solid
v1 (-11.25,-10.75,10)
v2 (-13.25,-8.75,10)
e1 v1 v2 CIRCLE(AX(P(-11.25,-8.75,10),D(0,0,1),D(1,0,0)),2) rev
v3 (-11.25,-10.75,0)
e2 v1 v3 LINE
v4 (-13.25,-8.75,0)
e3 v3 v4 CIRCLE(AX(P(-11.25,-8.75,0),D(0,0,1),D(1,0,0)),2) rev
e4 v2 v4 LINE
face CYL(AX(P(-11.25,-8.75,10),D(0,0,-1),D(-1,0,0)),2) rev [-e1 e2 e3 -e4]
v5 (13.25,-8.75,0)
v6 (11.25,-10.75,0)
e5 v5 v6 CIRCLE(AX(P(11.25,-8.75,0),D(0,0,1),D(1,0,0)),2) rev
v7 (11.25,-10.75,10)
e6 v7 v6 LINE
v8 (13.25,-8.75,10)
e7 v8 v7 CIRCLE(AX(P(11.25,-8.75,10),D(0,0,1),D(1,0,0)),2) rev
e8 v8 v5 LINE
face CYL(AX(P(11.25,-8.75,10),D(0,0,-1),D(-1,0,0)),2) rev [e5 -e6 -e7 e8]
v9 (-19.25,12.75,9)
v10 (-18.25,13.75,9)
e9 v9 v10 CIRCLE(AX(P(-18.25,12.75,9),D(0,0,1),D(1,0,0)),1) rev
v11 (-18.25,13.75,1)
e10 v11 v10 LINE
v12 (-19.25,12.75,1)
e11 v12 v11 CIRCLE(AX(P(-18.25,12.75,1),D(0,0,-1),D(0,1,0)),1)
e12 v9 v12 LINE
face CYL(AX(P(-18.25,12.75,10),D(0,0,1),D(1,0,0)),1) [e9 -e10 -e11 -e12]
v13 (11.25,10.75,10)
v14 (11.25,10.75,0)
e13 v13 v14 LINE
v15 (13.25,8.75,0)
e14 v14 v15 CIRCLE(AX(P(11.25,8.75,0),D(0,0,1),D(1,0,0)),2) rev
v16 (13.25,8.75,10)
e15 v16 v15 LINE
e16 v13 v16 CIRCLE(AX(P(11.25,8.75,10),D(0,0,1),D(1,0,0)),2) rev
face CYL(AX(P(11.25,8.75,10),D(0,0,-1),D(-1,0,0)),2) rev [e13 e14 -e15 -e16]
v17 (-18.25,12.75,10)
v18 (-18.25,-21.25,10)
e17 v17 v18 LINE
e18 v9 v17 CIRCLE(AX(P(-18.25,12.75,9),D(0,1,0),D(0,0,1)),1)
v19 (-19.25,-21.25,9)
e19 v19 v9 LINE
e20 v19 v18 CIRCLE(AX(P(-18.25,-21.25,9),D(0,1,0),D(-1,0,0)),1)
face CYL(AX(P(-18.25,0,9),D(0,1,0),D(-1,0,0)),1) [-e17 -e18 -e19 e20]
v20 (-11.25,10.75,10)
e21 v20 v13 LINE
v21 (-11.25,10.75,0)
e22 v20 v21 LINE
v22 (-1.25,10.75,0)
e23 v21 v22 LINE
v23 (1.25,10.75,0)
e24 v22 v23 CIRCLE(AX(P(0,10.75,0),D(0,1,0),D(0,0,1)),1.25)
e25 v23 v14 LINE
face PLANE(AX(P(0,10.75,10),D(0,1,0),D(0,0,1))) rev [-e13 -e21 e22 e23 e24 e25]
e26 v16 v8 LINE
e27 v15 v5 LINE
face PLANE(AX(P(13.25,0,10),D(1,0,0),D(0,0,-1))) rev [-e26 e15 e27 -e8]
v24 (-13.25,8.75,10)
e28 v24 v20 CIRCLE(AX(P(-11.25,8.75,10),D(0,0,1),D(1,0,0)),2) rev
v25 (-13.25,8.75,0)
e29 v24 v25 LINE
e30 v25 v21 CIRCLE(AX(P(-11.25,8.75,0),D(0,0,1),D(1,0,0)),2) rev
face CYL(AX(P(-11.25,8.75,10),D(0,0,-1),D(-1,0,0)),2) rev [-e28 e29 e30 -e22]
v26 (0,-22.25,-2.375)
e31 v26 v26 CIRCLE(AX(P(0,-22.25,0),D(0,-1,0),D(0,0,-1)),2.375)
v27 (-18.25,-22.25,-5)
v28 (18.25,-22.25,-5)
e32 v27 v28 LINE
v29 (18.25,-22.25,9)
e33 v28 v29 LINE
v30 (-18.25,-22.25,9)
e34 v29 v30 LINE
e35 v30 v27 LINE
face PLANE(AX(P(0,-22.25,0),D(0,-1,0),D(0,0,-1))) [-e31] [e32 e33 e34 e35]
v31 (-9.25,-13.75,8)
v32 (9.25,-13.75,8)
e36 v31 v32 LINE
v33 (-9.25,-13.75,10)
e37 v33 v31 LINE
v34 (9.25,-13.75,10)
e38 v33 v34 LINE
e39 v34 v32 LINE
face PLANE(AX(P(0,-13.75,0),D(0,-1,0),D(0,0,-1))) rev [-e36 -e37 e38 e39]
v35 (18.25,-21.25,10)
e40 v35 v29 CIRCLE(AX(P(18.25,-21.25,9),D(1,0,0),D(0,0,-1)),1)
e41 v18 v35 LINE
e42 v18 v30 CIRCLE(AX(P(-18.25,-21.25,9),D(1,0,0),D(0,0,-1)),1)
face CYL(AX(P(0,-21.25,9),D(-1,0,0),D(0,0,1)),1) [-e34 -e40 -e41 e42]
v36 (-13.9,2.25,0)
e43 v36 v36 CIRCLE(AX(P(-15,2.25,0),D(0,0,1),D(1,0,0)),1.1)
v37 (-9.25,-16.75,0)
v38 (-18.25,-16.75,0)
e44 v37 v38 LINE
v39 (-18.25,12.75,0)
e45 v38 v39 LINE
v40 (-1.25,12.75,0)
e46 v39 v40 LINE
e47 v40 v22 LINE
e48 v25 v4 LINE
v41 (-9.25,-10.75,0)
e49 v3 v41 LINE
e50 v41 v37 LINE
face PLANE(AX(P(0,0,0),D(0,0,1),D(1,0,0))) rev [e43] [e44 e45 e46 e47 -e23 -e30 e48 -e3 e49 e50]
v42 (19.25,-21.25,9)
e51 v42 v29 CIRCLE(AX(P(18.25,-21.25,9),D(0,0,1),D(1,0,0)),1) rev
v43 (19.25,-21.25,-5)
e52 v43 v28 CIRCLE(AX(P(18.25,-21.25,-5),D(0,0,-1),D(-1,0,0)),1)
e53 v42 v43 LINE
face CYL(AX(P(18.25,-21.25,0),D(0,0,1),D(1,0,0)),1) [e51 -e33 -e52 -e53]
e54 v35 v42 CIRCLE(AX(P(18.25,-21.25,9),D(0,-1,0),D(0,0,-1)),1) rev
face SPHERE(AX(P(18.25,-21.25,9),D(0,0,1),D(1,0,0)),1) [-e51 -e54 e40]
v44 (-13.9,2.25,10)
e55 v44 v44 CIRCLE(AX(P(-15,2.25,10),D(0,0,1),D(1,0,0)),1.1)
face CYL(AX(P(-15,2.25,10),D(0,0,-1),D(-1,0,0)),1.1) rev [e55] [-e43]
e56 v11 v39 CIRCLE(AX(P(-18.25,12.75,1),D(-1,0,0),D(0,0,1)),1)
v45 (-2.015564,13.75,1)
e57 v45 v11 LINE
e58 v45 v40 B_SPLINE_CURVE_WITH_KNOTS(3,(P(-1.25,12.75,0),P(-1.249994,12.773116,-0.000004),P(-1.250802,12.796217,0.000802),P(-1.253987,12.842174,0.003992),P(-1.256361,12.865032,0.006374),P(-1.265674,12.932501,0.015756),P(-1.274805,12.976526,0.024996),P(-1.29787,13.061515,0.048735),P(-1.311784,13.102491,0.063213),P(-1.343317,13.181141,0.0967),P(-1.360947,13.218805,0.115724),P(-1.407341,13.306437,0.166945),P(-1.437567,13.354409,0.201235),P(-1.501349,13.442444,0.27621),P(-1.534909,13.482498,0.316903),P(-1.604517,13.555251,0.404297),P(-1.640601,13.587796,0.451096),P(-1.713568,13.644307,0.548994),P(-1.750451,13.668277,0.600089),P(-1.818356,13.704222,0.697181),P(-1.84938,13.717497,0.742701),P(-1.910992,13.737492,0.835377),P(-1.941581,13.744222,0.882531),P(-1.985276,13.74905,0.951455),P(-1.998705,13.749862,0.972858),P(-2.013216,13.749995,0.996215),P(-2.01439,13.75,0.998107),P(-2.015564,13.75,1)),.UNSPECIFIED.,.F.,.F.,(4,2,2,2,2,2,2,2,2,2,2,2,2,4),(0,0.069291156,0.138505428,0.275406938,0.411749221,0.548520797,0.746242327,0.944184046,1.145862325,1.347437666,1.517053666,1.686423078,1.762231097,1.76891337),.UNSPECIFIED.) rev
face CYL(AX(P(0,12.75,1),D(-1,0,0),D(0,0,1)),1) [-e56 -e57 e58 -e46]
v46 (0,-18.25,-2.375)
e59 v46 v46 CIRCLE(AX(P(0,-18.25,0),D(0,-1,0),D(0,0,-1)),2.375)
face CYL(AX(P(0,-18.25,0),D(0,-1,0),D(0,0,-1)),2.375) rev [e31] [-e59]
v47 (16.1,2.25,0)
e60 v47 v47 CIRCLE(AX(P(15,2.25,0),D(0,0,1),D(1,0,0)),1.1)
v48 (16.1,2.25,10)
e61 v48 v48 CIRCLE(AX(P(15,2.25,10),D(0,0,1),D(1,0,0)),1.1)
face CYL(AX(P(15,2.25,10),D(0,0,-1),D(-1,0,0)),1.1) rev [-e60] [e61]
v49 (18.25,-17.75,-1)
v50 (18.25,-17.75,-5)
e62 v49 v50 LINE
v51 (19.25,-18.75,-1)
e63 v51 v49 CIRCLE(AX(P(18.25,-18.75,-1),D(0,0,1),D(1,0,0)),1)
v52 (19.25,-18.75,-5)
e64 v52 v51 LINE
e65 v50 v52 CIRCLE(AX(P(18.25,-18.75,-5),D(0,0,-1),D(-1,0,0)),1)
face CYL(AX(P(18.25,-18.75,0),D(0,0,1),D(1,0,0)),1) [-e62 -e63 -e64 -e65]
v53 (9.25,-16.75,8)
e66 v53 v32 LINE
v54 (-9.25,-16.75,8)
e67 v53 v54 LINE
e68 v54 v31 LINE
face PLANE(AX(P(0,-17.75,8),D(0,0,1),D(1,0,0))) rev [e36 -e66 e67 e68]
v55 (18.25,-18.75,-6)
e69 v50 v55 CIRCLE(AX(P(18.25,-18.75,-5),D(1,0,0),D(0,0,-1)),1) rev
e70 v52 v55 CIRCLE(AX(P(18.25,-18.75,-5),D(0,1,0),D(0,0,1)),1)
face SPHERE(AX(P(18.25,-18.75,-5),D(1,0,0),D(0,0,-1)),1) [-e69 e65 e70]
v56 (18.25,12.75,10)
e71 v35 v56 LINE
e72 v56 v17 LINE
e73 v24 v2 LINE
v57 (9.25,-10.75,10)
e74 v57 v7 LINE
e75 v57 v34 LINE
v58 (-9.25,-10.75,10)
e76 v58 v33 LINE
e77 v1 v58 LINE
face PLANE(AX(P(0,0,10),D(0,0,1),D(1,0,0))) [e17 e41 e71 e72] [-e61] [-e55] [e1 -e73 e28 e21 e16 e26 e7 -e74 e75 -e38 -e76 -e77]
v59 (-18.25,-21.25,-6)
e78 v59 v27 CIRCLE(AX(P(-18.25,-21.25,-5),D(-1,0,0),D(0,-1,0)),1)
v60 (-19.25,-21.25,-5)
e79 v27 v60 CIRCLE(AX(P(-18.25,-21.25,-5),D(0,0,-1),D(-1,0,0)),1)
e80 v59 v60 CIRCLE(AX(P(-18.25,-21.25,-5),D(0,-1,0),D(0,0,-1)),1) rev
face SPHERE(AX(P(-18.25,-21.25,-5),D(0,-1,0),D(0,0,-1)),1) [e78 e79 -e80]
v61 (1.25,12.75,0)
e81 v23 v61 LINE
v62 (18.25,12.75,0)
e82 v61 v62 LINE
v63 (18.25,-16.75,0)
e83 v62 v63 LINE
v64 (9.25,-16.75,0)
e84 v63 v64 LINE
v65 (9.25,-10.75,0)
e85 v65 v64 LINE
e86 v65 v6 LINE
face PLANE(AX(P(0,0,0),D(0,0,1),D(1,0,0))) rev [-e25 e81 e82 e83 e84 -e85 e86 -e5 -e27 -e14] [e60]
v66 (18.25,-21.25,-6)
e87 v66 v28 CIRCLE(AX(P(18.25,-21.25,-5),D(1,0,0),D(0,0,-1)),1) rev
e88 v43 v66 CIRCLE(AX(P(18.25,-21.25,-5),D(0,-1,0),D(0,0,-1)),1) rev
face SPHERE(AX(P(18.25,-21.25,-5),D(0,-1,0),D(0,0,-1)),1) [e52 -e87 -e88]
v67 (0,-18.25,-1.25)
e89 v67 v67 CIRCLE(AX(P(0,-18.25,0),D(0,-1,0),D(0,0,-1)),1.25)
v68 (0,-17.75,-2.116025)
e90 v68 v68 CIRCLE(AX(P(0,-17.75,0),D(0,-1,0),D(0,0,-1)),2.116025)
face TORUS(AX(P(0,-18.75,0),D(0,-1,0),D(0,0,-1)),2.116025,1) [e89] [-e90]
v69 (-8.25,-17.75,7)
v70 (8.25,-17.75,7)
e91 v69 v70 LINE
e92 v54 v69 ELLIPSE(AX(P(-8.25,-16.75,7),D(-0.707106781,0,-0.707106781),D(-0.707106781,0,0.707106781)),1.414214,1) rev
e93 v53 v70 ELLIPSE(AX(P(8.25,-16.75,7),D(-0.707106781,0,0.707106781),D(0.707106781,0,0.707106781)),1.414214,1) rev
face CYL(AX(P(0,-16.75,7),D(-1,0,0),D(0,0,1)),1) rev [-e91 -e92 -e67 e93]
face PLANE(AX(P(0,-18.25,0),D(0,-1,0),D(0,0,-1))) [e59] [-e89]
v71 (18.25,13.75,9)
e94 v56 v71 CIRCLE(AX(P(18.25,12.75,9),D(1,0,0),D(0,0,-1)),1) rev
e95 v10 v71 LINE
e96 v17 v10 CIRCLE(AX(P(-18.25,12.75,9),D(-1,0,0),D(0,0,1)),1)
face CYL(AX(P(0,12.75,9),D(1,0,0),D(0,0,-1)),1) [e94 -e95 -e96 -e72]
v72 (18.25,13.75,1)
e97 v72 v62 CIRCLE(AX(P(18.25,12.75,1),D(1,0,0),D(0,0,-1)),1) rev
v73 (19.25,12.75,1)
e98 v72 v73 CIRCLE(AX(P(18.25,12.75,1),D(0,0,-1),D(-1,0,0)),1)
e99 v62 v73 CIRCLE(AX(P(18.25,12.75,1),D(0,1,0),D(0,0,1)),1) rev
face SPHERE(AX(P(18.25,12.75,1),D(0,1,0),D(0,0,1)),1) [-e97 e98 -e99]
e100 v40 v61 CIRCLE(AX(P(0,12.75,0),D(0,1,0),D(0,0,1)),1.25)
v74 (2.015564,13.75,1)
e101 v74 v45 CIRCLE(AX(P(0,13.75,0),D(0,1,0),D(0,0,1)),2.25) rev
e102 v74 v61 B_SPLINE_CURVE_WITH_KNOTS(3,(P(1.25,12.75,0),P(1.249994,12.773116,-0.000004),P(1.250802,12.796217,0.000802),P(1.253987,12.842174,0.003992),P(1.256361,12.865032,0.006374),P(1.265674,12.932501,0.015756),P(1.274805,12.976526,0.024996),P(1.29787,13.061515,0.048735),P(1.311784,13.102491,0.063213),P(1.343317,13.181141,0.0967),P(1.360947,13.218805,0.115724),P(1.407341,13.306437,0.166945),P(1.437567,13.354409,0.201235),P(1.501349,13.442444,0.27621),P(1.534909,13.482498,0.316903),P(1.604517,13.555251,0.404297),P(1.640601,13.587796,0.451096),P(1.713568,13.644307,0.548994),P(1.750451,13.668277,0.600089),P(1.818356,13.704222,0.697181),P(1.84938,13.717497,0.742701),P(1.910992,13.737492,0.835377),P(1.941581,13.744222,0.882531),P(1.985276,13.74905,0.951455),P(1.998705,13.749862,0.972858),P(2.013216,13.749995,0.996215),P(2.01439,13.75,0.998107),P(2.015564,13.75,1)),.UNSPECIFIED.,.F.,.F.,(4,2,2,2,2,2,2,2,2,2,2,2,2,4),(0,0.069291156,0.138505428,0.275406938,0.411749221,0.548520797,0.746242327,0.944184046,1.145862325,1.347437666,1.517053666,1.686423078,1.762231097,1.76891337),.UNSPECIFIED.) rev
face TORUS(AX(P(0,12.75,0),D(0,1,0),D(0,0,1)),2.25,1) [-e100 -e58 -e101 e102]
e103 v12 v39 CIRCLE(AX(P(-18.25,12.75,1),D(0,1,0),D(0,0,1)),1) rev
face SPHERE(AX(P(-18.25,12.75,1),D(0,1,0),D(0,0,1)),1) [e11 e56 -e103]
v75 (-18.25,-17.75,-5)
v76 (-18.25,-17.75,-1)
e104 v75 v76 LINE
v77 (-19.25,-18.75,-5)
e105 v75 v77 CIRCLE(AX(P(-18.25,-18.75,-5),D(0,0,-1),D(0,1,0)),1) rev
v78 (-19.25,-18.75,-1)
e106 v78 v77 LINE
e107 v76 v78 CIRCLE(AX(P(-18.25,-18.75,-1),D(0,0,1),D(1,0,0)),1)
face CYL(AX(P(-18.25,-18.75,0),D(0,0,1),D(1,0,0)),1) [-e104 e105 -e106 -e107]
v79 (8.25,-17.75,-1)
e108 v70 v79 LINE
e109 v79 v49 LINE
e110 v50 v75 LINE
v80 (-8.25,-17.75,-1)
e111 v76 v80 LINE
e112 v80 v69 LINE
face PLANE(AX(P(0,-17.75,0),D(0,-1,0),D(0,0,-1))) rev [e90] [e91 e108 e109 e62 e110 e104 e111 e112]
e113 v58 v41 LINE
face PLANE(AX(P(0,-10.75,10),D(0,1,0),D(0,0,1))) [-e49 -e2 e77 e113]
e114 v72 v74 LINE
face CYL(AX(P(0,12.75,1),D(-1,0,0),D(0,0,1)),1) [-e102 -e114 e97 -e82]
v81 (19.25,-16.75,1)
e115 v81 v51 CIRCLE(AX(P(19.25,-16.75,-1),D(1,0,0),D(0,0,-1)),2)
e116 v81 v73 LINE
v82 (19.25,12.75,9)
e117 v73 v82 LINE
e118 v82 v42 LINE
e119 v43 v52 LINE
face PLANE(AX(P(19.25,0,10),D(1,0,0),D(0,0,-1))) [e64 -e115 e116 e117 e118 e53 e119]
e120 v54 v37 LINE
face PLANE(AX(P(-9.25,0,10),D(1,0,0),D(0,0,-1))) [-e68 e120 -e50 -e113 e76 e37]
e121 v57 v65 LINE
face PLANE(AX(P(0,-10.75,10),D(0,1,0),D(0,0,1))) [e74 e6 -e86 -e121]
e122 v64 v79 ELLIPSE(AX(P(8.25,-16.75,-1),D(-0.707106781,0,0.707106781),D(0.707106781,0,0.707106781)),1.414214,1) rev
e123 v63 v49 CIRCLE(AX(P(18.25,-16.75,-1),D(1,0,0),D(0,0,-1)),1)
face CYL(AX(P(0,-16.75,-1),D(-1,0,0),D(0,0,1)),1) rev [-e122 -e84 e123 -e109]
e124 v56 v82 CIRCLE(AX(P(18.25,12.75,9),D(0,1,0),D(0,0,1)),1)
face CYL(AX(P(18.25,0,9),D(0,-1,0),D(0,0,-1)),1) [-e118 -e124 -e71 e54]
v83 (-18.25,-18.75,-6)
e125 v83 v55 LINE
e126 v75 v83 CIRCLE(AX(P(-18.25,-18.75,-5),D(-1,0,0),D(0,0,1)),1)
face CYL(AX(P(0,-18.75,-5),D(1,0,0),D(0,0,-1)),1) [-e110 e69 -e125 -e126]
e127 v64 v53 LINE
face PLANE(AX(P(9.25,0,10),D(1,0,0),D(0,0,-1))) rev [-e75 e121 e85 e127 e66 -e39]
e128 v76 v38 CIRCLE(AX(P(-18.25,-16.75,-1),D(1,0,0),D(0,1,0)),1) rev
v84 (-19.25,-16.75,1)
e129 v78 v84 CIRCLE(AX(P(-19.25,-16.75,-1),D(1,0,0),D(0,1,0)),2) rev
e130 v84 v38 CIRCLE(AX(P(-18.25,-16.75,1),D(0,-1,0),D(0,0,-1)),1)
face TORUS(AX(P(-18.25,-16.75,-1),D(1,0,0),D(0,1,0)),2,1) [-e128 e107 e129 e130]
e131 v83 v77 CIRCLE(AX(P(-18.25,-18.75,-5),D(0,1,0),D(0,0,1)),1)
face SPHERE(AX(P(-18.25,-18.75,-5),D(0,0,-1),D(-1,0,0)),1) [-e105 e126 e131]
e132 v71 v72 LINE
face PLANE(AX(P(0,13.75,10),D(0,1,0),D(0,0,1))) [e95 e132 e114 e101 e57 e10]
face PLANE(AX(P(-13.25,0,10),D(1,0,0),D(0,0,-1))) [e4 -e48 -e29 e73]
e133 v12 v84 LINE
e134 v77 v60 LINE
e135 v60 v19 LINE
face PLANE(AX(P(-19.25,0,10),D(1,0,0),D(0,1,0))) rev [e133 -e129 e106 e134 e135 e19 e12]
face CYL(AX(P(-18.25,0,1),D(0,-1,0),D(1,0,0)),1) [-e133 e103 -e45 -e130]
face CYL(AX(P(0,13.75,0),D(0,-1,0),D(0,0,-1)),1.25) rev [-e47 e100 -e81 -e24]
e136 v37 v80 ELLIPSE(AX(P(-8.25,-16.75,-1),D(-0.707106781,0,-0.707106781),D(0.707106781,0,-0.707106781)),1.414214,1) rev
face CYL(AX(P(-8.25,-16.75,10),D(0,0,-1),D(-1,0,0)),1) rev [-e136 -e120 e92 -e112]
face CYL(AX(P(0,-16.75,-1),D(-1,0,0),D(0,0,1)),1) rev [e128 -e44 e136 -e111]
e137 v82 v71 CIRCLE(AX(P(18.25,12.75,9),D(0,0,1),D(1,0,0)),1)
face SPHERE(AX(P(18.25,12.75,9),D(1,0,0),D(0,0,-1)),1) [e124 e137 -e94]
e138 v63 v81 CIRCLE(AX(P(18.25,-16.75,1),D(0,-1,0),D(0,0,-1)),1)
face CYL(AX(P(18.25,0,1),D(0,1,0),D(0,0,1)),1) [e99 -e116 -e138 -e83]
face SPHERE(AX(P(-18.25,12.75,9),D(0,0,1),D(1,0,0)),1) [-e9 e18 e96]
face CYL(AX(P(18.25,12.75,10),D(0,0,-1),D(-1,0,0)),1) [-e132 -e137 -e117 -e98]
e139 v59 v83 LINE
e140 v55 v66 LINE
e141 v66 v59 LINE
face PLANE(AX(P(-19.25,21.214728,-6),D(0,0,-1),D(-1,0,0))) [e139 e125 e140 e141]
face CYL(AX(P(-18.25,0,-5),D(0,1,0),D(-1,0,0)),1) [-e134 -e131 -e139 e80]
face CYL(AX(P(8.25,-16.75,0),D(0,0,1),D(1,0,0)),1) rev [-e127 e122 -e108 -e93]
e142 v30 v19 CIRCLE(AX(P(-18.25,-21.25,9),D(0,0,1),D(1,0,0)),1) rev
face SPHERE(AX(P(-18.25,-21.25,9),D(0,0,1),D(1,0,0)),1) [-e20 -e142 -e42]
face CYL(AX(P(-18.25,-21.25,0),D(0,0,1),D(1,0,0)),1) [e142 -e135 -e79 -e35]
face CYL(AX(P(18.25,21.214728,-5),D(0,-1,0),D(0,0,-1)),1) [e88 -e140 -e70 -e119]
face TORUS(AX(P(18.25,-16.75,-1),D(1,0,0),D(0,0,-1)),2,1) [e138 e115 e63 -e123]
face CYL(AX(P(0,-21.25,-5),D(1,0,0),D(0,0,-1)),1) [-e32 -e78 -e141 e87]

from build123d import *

# Parameters (mm, degrees)
SKETCH1_R           = 1.1
BOSS_EXTRUDE1_DEPTH = 10
SKETCH2_W           = 10
SKETCH2_H           = 8
SKETCH2_H_2         = 2
BOSS_EXTRUDE2_DEPTH = 4
SKETCH3_W           = 38.5
SKETCH3_H           = 10
BOSS_EXTRUDE3_DEPTH = 4.5
SKETCH4_W           = 38.5
SKETCH4_H           = 6
BOSS_EXTRUDE4_DEPTH = 4.5
SKETCH5_R           = 2.375
CUT_EXTRUDE1_DEPTH  = 4
SKETCH6_R           = 1.25
CUT_EXTRUDE2_DEPTH  = 39.659571907
FILLET1_R           = 1
FILLET2_R           = 1


with BuildPart() as part:
    # Sketch1 → Boss-Extrude1 (new body)
    with BuildSketch(Plane.XY):
        with BuildLine():
            ThreePointArc((-13.25, 8.75), (-12.664213562, 10.164213562), (-11.25, 10.75))
            Line((-11.25, 10.75), (11.25, 10.75))
            ThreePointArc((11.25, 10.75), (12.664213562, 10.164213562), (13.25, 8.75))
            Line((13.25, 8.75), (13.25, -8.75))
            ThreePointArc((13.25, -8.75), (12.664213562, -10.164213562), (11.25, -10.75))
            Line((11.25, -10.75), (9.25, -10.75))
            Line((9.25, -10.75), (9.25, -13.75))
            Line((9.25, -13.75), (19.25, -13.75))
            Line((19.25, -13.75), (19.25, 13.75))
            Line((19.25, 13.75), (-19.25, 13.75))
            Line((-19.25, 13.75), (-19.25, -13.75))
            Line((-19.25, -13.75), (-9.25, -13.75))
            Line((-9.25, -13.75), (-9.25, -10.75))
            Line((-9.25, -10.75), (-11.25, -10.75))
            ThreePointArc((-11.25, -10.75), (-12.664213562, -10.164213562), (-13.25, -8.75))
            Line((-13.25, -8.75), (-13.25, 8.75))
        make_face()
        with Locations((-15, 2.25)):
            Circle(SKETCH1_R, mode=Mode.SUBTRACT)
        with Locations((15, 2.25)):
            Circle(SKETCH1_R, mode=Mode.SUBTRACT)
    extrude(amount=BOSS_EXTRUDE1_DEPTH)

    # Sketch2 → Boss-Extrude2 (add)
    with BuildSketch(Plane.XZ.offset(13.75)):
        with Locations((-14.25, 4)):
            Rectangle(SKETCH2_W, SKETCH2_H)
        Polygon((9.25, 10), (-19.25, 10), (-19.25, 8), (-9.25, 8), (9.25, 8), align=None)
        with Locations((14.25, 9)):
            Rectangle(SKETCH2_W, SKETCH2_H_2)
        with Locations((14.25, 4)):
            Rectangle(SKETCH2_W, SKETCH2_H)
    extrude(amount=BOSS_EXTRUDE2_DEPTH)

    # Sketch3 → Boss-Extrude3 (add)
    with BuildSketch(Plane.XZ.offset(17.75)):
        with Locations((0, 5)):
            Rectangle(SKETCH3_W, SKETCH3_H)
    extrude(amount=BOSS_EXTRUDE3_DEPTH)

    # Sketch4 → Boss-Extrude4 (add)
    with BuildSketch(Plane.XZ.offset(22.25)):
        with Locations((0, -3)):
            Rectangle(SKETCH4_W, SKETCH4_H)
    extrude(amount=-BOSS_EXTRUDE4_DEPTH)

    # Sketch5 → Cut-Extrude1 (cut)
    with BuildSketch(Plane.XZ.offset(22.25)):
        with Locations(Location((0, 0, 0), (0, 0, 270))):
            Circle(SKETCH5_R)
    extrude(amount=-CUT_EXTRUDE1_DEPTH, mode=Mode.SUBTRACT)

    # Sketch6 → Cut-Extrude2 (cut, through all)
    with BuildSketch(Plane.XZ.offset(18.25)):
        with Locations(Location((0, 0, 0), (0, 0, 270))):
            Circle(SKETCH6_R)
    extrude(amount=-CUT_EXTRUDE2_DEPTH, mode=Mode.SUBTRACT)

    # Fillet1
    # the kernel refuses this fillet: 1 mm, written as the material it adds along each edge
    with BuildSketch(Plane(origin=(-19.25, -17.75, 0), x_dir=(0, 1, 0), z_dir=(1, 0, 0)), Plane(origin=(9.25, -17.75, 0), x_dir=(0, 1, 0), z_dir=(1, 0, 0))) as fillet1_piece_1:
        with BuildLine():
            CenterArc((FILLET1_R, -FILLET1_R), FILLET1_R, 90, 90)
            Line((0, -FILLET1_R), (0, 0))
            Line((0, 0), (FILLET1_R, 0))
        make_face()
    extrude(amount=10)
    with BuildSketch(Plane(origin=(-9.25, -17.75, 0), x_dir=(0, 1, 0), z_dir=(0, 0, 1))) as fillet1_piece_2:
        with BuildLine():
            CenterArc((FILLET1_R, -FILLET1_R), FILLET1_R, 90, 90)
            Line((0, -FILLET1_R), (0, 0))
            Line((0, 0), (FILLET1_R, 0))
        make_face()
    extrude(amount=8)
    with BuildSketch(Plane(origin=(-11.75, -17.75, 8), x_dir=(0, 0, -1), z_dir=(1, 0, 0))) as fillet1_piece_3:
        with BuildLine():
            CenterArc((FILLET1_R, FILLET1_R), FILLET1_R, 180, 90)
            Line((0, FILLET1_R), (0, 0))
            Line((0, 0), (FILLET1_R, 0))
        make_face()
    extrude(amount=23.5)
    with BuildSketch(Plane(origin=(9.25, -17.75, 8), x_dir=(-1, 0, 0), z_dir=(0, 0, -1))) as fillet1_piece_4:
        with BuildLine():
            CenterArc((FILLET1_R, FILLET1_R), FILLET1_R, 180, 90)
            Line((0, FILLET1_R), (0, 0))
            Line((0, 0), (FILLET1_R, 0))
        make_face()
    extrude(amount=8)
    with BuildSketch(Plane(origin=(-19.25, -17.75, 0), x_dir=(0, 1, 0), z_dir=(1, 0, 0))) as fillet1_piece_5a_section:
        with BuildLine():
            CenterArc((FILLET1_R, -FILLET1_R), FILLET1_R, 90, 90)
            Line((0, -FILLET1_R), (0, 0))
            Line((0, 0), (FILLET1_R, 0))
        make_face()
    fillet1_piece_5a = extrude(amount=12.5, mode=Mode.PRIVATE)
    fillet1_piece_5a = split(fillet1_piece_5a, bisect_by=Plane(origin=(-9.25, -17.75, 0), z_dir=(1, 0, 0)), keep=Keep.TOP, mode=Mode.PRIVATE)
    with BuildSketch(Plane(origin=(-9.25, -17.75, -2.5), x_dir=(0, 1, 0), z_dir=(0, 0, 1))) as fillet1_piece_5b_section:
        with BuildLine():
            CenterArc((FILLET1_R, -FILLET1_R), FILLET1_R, 90, 90)
            Line((0, -FILLET1_R), (0, 0))
            Line((0, 0), (FILLET1_R, 0))
        make_face()
    fillet1_piece_5b = extrude(amount=10.5, mode=Mode.PRIVATE)
    fillet1_piece_5b = split(fillet1_piece_5b, bisect_by=Plane(origin=(-9.25, -17.75, 0), z_dir=(0, 0, -1)), keep=Keep.TOP, mode=Mode.PRIVATE)
    fillet1_piece_5 = fillet1_piece_5a & fillet1_piece_5b
    add(fillet1_piece_5)
    with BuildSketch(Plane(origin=(6.75, -17.75, 0), x_dir=(0, 1, 0), z_dir=(1, 0, 0))) as fillet1_piece_6a_section:
        with BuildLine():
            CenterArc((FILLET1_R, -FILLET1_R), FILLET1_R, 90, 90)
            Line((0, -FILLET1_R), (0, 0))
            Line((0, 0), (FILLET1_R, 0))
        make_face()
    fillet1_piece_6a = extrude(amount=12.5, mode=Mode.PRIVATE)
    fillet1_piece_6a = split(fillet1_piece_6a, bisect_by=Plane(origin=(9.25, -17.75, 0), z_dir=(-1, 0, 0)), keep=Keep.TOP, mode=Mode.PRIVATE)
    with BuildSketch(Plane(origin=(9.25, -17.75, 8), x_dir=(-1, 0, 0), z_dir=(0, 0, -1))) as fillet1_piece_6b_section:
        with BuildLine():
            CenterArc((FILLET1_R, FILLET1_R), FILLET1_R, 180, 90)
            Line((0, FILLET1_R), (0, 0))
            Line((0, 0), (FILLET1_R, 0))
        make_face()
    fillet1_piece_6b = extrude(amount=10.5, mode=Mode.PRIVATE)
    fillet1_piece_6b = split(fillet1_piece_6b, bisect_by=Plane(origin=(9.25, -17.75, 0), z_dir=(0, 0, -1)), keep=Keep.TOP, mode=Mode.PRIVATE)
    fillet1_piece_6 = fillet1_piece_6a & fillet1_piece_6b
    add(fillet1_piece_6)
    # the kernel refuses this fillet: 1 mm, written as the material it takes off along each edge
    with BuildSketch(Plane(origin=(18.25, -21.25, -5), x_dir=(0, -1, 0), z_dir=(1, 0, 0))) as fillet1_2_piece_1_section:
        Polygon((0, 0), (FILLET1_R * 1.02, 0), (FILLET1_R * 1.02, FILLET1_R * 1.02), (0, FILLET1_R * 1.02), align=None)
    fillet1_2_piece_1 = extrude(amount=FILLET1_R * 1.02, mode=Mode.PRIVATE)
    fillet1_2_piece_1 = fillet1_2_piece_1 - Plane(origin=(18.25, -21.25, -5), x_dir=(0, 0.7071067811865475, 0.7071067811865475), z_dir=(1, 0, 0)) * Sphere(FILLET1_R, mode=Mode.PRIVATE)
    add(fillet1_2_piece_1, mode=Mode.SUBTRACT)
    with BuildSketch(Plane(origin=(-18.25, -21.25, -5), x_dir=(-1, 0, 0), z_dir=(0, -1, 0))) as fillet1_2_piece_2_section:
        Polygon((0, 0), (FILLET1_R * 1.02, 0), (FILLET1_R * 1.02, FILLET1_R * 1.02), (0, FILLET1_R * 1.02), align=None)
    fillet1_2_piece_2 = extrude(amount=FILLET1_R * 1.02, mode=Mode.PRIVATE)
    fillet1_2_piece_2 = fillet1_2_piece_2 - Plane(origin=(-18.25, -21.25, -5), x_dir=(0.7071067811865475, 0, 0.7071067811865475), z_dir=(0, -1, 0)) * Sphere(FILLET1_R, mode=Mode.PRIVATE)
    add(fillet1_2_piece_2, mode=Mode.SUBTRACT)
    with BuildSketch(Plane(origin=(-18.25, 12.75, 9), x_dir=(-1, 0, 0), z_dir=(0, 0, 1))) as fillet1_2_piece_3_section:
        Polygon((0, 0), (FILLET1_R * 1.02, 0), (FILLET1_R * 1.02, -FILLET1_R * 1.02), (0, -FILLET1_R * 1.02), align=None)
    fillet1_2_piece_3 = extrude(amount=FILLET1_R * 1.02, mode=Mode.PRIVATE)
    fillet1_2_piece_3 = fillet1_2_piece_3 - Plane(origin=(-18.25, 12.75, 9), x_dir=(0.7071067811865476, -0.7071067811865475, 0), z_dir=(0, 0, 1)) * Sphere(FILLET1_R, mode=Mode.PRIVATE)
    add(fillet1_2_piece_3, mode=Mode.SUBTRACT)
    with BuildSketch(Plane(origin=(18.25, 12.75, 9), x_dir=(0, 1, 0), z_dir=(1, 0, 0))) as fillet1_2_piece_4_section:
        Polygon((0, 0), (FILLET1_R * 1.02, 0), (FILLET1_R * 1.02, FILLET1_R * 1.02), (0, FILLET1_R * 1.02), align=None)
    fillet1_2_piece_4 = extrude(amount=FILLET1_R * 1.02, mode=Mode.PRIVATE)
    fillet1_2_piece_4 = fillet1_2_piece_4 - Plane(origin=(18.25, 12.75, 9), x_dir=(0, -0.7071067811865475, -0.7071067811865475), z_dir=(1, 0, 0)) * Sphere(FILLET1_R, mode=Mode.PRIVATE)
    add(fillet1_2_piece_4, mode=Mode.SUBTRACT)
    with BuildSketch(Plane(origin=(18.25, -22.25, -6), x_dir=(0, 1, 0), z_dir=(-1, 0, 0)), Plane(origin=(18.25, 13.75, 10), x_dir=(0, -1, 0), z_dir=(-1, 0, 0))) as fillet1_2_piece_5:
        with BuildLine():
            CenterArc((FILLET1_R, -FILLET1_R), FILLET1_R, 90, 90)
            Line((0, -FILLET1_R), (0, 0))
            Line((0, 0), (FILLET1_R, 0))
        make_face()
    extrude(amount=36.5, mode=Mode.SUBTRACT)
    with BuildSketch(Plane(origin=(21.75, -17.75, -6), x_dir=(0, 0, 1), z_dir=(-1, 0, 0))) as fillet1_2_piece_6:
        with BuildLine():
            CenterArc((FILLET1_R, -FILLET1_R), FILLET1_R, 90, 90)
            Line((0, -FILLET1_R), (0, 0))
            Line((0, 0), (FILLET1_R, 0))
        make_face()
    extrude(amount=43.5, mode=Mode.SUBTRACT)
    with BuildSketch(Plane(origin=(21.75, 13.75, 0), x_dir=(0, -1, 0), z_dir=(-1, 0, 0))) as fillet1_2_piece_7:
        with BuildLine():
            CenterArc((FILLET1_R, FILLET1_R), FILLET1_R, 180, 90)
            Line((0, FILLET1_R), (0, 0))
            Line((0, 0), (FILLET1_R, 0))
        make_face()
    extrude(amount=23, mode=Mode.SUBTRACT)
    with BuildSketch(Plane(origin=(0, 13.75, 0), x_dir=(0.003141587485879628, 0, -0.9999950652018581), z_dir=(-0.9999950652018581, 0, -0.003141587485879628))) as fillet1_2_piece_8:
        with BuildLine():
            CenterArc((1.25 + FILLET1_R, FILLET1_R), FILLET1_R, 180, 90)
            Line((1.25 + FILLET1_R, 0), (1.25, 0))
            Line((1.25, 0), (1.25, FILLET1_R))
        make_face()
    revolve(axis=Axis((0, 13.75, 0), (0, -1, 0)), revolution_arc=359.64, mode=Mode.SUBTRACT)
    with BuildSketch(Plane(origin=(0, -17.75, 0), x_dir=(0, 0, -1), z_dir=(-1, 0, 0))) as fillet1_2_piece_9:
        with BuildLine():
            CenterArc((2.116025404, 1), FILLET1_R, 210, 60)
            Line((1.25, 0.5), (1.25, 0))
            Line((1.25, 0), (2.116025404, 0))
        make_face()
    revolve(axis=Axis((0, -17.75, 0), (0, -1, 0)), mode=Mode.SUBTRACT)
    with BuildSketch(Plane(origin=(1.25, 13.75, 0), x_dir=(0, 0, 1), z_dir=(-1, 0, 0))) as fillet1_2_piece_10:
        with BuildLine():
            CenterArc((FILLET1_R, -FILLET1_R), FILLET1_R, 90, 90)
            Line((0, -FILLET1_R), (0, 0))
            Line((0, 0), (FILLET1_R, 0))
        make_face()
    extrude(amount=23, mode=Mode.SUBTRACT)
    with BuildSketch(Plane(origin=(-19.25, 13.75, -2.5), x_dir=(0, -1, 0), z_dir=(0, 0, 1))) as fillet1_2_piece_11:
        with BuildLine():
            CenterArc((FILLET1_R, FILLET1_R), FILLET1_R, 180, 90)
            Line((0, FILLET1_R), (0, 0))
            Line((0, 0), (FILLET1_R, 0))
        make_face()
    extrude(amount=11.5, mode=Mode.SUBTRACT)
    with BuildSketch(Plane(origin=(19.25, 13.75, -2.5), x_dir=(0, -1, 0), z_dir=(0, 0, 1))) as fillet1_2_piece_12:
        with BuildLine():
            CenterArc((FILLET1_R, -FILLET1_R), FILLET1_R, 90, 90)
            Line((0, -FILLET1_R), (0, 0))
            Line((0, 0), (FILLET1_R, 0))
        make_face()
    extrude(amount=11.5, mode=Mode.SUBTRACT)
    with BuildSketch(Plane(origin=(19.25, -24.75, 10), x_dir=(-1, 0, 0), z_dir=(0, 1, 0)), Plane(origin=(-19.25, 12.75, 10), x_dir=(1, 0, 0), z_dir=(0, -1, 0))) as fillet1_2_piece_13:
        with BuildLine():
            CenterArc((FILLET1_R, -FILLET1_R), FILLET1_R, 90, 90)
            Line((0, -FILLET1_R), (0, 0))
            Line((0, 0), (FILLET1_R, 0))
        make_face()
    extrude(amount=37.5, mode=Mode.SUBTRACT)
    with BuildSketch(Plane(origin=(-19.25, -22.25, -5), x_dir=(1, 0, 0), z_dir=(0, 0, 1))) as fillet1_2_piece_14:
        with BuildLine():
            CenterArc((FILLET1_R, FILLET1_R), FILLET1_R, 180, 90)
            Line((0, FILLET1_R), (0, 0))
            Line((0, 0), (FILLET1_R, 0))
        make_face()
    extrude(amount=17.5, mode=Mode.SUBTRACT)
    with BuildSketch(Plane(origin=(19.25, -22.25, 12.5), x_dir=(0, 1, 0), z_dir=(0, 0, -1))) as fillet1_2_piece_15:
        with BuildLine():
            CenterArc((FILLET1_R, -FILLET1_R), FILLET1_R, 90, 90)
            Line((0, -FILLET1_R), (0, 0))
            Line((0, 0), (FILLET1_R, 0))
        make_face()
    extrude(amount=17.5, mode=Mode.SUBTRACT)
    with BuildSketch(Plane(origin=(-19.25, -21.25, -6), x_dir=(1, 0, 0), z_dir=(0, 1, 0))) as fillet1_2_piece_16:
        with BuildLine():
            CenterArc((FILLET1_R, -FILLET1_R), FILLET1_R, 90, 90)
            Line((0, -FILLET1_R), (0, 0))
            Line((0, 0), (FILLET1_R, 0))
        make_face()
    extrude(amount=6, mode=Mode.SUBTRACT)
    with BuildSketch(Plane(origin=(19.25, -21.25, -6), x_dir=(-1, 0, 0), z_dir=(0, 1, 0))) as fillet1_2_piece_17:
        with BuildLine():
            CenterArc((FILLET1_R, FILLET1_R), FILLET1_R, 180, 90)
            Line((0, FILLET1_R), (0, 0))
            Line((0, 0), (FILLET1_R, 0))
        make_face()
    extrude(amount=6, mode=Mode.SUBTRACT)
    # the kernel refuses this fillet: 1 mm, written as the material it takes off along each edge
    with BuildSketch(Plane(origin=(18.25, 12.75, 1), x_dir=(1, 0, 0), z_dir=(0, 0, -1))) as fillet1_3_piece_1_section:
        Polygon((0, 0), (FILLET1_R * 1.02, 0), (FILLET1_R * 1.02, -FILLET1_R * 1.02), (0, -FILLET1_R * 1.02), align=None)
    fillet1_3_piece_1 = extrude(amount=FILLET1_R * 1.02, mode=Mode.PRIVATE)
    fillet1_3_piece_1 = fillet1_3_piece_1 - Plane(origin=(18.25, 12.75, 1), x_dir=(-0.7071067811865475, -0.7071067811865475, 0), z_dir=(0, 0, -1)) * Sphere(FILLET1_R, mode=Mode.PRIVATE)
    add(fillet1_3_piece_1, mode=Mode.SUBTRACT)
    with BuildSketch(Plane(origin=(-18.25, 12.75, 1), x_dir=(-1, 0, 0), z_dir=(0, 0, -1))) as fillet1_3_piece_2_section:
        Polygon((0, 0), (FILLET1_R * 1.02, 0), (FILLET1_R * 1.02, FILLET1_R * 1.02), (0, FILLET1_R * 1.02), align=None)
    fillet1_3_piece_2 = extrude(amount=FILLET1_R * 1.02, mode=Mode.PRIVATE)
    fillet1_3_piece_2 = fillet1_3_piece_2 - Plane(origin=(-18.25, 12.75, 1), x_dir=(0.7071067811865476, -0.7071067811865475, 0), z_dir=(0, 0, -1)) * Sphere(FILLET1_R, mode=Mode.PRIVATE)
    add(fillet1_3_piece_2, mode=Mode.SUBTRACT)
    with BuildSketch(Plane(origin=(18.25, -18.75, -5), x_dir=(0, 1, 0), z_dir=(1, 0, 0))) as fillet1_3_piece_3_section:
        Polygon((0, 0), (FILLET1_R * 1.02, 0), (FILLET1_R * 1.02, -FILLET1_R * 1.02), (0, -FILLET1_R * 1.02), align=None)
    fillet1_3_piece_3 = extrude(amount=FILLET1_R * 1.02, mode=Mode.PRIVATE)
    fillet1_3_piece_3 = fillet1_3_piece_3 - Plane(origin=(18.25, -18.75, -5), x_dir=(0, -0.7071067811865475, 0.7071067811865475), z_dir=(1, 0, 0)) * Sphere(FILLET1_R, mode=Mode.PRIVATE)
    add(fillet1_3_piece_3, mode=Mode.SUBTRACT)
    with BuildSketch(Plane(origin=(-18.25, -18.75, -5), x_dir=(0, 1, 0), z_dir=(-1, 0, 0))) as fillet1_3_piece_4_section:
        Polygon((0, 0), (FILLET1_R * 1.02, 0), (FILLET1_R * 1.02, FILLET1_R * 1.02), (0, FILLET1_R * 1.02), align=None)
    fillet1_3_piece_4 = extrude(amount=FILLET1_R * 1.02, mode=Mode.PRIVATE)
    fillet1_3_piece_4 = fillet1_3_piece_4 - Plane(origin=(-18.25, -18.75, -5), x_dir=(0, -0.7071067811865475, 0.7071067811865475), z_dir=(-1, 0, 0)) * Sphere(FILLET1_R, mode=Mode.PRIVATE)
    add(fillet1_3_piece_4, mode=Mode.SUBTRACT)
    with BuildSketch(Plane(origin=(-19.25, -17.75, -5), x_dir=(0, -1, 0), z_dir=(0, 0, 1)), Plane(origin=(19.25, -17.75, -1), x_dir=(0, -1, 0), z_dir=(0, 0, -1))) as fillet1_3_piece_5:
        with BuildLine():
            CenterArc((FILLET1_R, FILLET1_R), FILLET1_R, 180, 90)
            Line((0, FILLET1_R), (0, 0))
            Line((0, 0), (FILLET1_R, 0))
        make_face()
    extrude(amount=4, mode=Mode.SUBTRACT)
    with BuildSketch(Plane(origin=(-19.25, -16.75, 0), x_dir=(1, 0, 0), z_dir=(0, 1, 0)), Plane(origin=(19.25, 12.75, 0), x_dir=(-1, 0, 0), z_dir=(0, -1, 0))) as fillet1_3_piece_6:
        with BuildLine():
            CenterArc((FILLET1_R, -FILLET1_R), FILLET1_R, 90, 90)
            Line((0, -FILLET1_R), (0, 0))
            Line((0, 0), (FILLET1_R, 0))
        make_face()
    extrude(amount=29.5, mode=Mode.SUBTRACT)
    with BuildSketch(Plane(origin=(19.25, -16.75, -1), x_dir=(0, 0, 1), z_dir=(0, 1, 0))) as fillet1_3_piece_7:
        with BuildLine():
            CenterArc((1 + FILLET1_R, -FILLET1_R), FILLET1_R, 90, 90)
            Line((1, -FILLET1_R), (1, 0))
            Line((1, 0), (1 + FILLET1_R, 0))
        make_face()
    revolve(axis=Axis((19.25, -16.75, -1), (1, 0, 0)), revolution_arc=90, mode=Mode.SUBTRACT)
    with BuildSketch(Plane(origin=(-19.25, -16.75, -1), x_dir=(0, 0, 1), z_dir=(0, 1, 0))) as fillet1_3_piece_8:
        with BuildLine():
            CenterArc((1 + FILLET1_R, FILLET1_R), FILLET1_R, 180, 90)
            Line((1 + FILLET1_R, 0), (1, 0))
            Line((1, 0), (1, FILLET1_R))
        make_face()
    revolve(axis=Axis((-19.25, -16.75, -1), (1, 0, 0)), revolution_arc=90, mode=Mode.SUBTRACT)

    # Fillet2
    # the kernel refuses this fillet: 1 mm, written as the material it takes off along each edge
    with BuildSketch(Plane(origin=(18.25, -21.25, 9), x_dir=(0, -1, 0), z_dir=(0, 0, 1))) as fillet2_piece_1_section:
        Polygon((0, 0), (FILLET2_R, 0), (FILLET2_R, FILLET2_R), (0, FILLET2_R), align=None)
    fillet2_piece_1 = extrude(amount=FILLET2_R, mode=Mode.PRIVATE)
    fillet2_piece_1 = fillet2_piece_1 - Plane(origin=(18.25, -21.25, 9), x_dir=(-0.7071067811865475, 0.7071067811865475, 0), z_dir=(0, 0, 1)) * Sphere(FILLET2_R, mode=Mode.PRIVATE)
    add(fillet2_piece_1, mode=Mode.SUBTRACT)
    with BuildSketch(Plane(origin=(-18.25, -21.25, 9), x_dir=(0, -1, 0), z_dir=(0, 0, 1))) as fillet2_piece_2_section:
        Polygon((0, 0), (FILLET2_R, 0), (FILLET2_R, -FILLET2_R), (0, -FILLET2_R), align=None)
    fillet2_piece_2 = extrude(amount=FILLET2_R, mode=Mode.PRIVATE)
    fillet2_piece_2 = fillet2_piece_2 - Plane(origin=(-18.25, -21.25, 9), x_dir=(0.7071067811865475, 0.7071067811865475, 0), z_dir=(0, 0, 1)) * Sphere(FILLET2_R, mode=Mode.PRIVATE)
    add(fillet2_piece_2, mode=Mode.SUBTRACT)
    with BuildSketch(Plane(origin=(-18.25, -22.25, 10), x_dir=(0, 1, 0), z_dir=(1, 0, 0))) as fillet2_piece_3:
        with BuildLine():
            CenterArc((FILLET2_R, -FILLET2_R), FILLET2_R, 90, 90)
            Line((0, -FILLET2_R), (0, 0))
            Line((0, 0), (FILLET2_R, 0))
        make_face()
    extrude(amount=36.5, mode=Mode.SUBTRACT)


solid = part.part
